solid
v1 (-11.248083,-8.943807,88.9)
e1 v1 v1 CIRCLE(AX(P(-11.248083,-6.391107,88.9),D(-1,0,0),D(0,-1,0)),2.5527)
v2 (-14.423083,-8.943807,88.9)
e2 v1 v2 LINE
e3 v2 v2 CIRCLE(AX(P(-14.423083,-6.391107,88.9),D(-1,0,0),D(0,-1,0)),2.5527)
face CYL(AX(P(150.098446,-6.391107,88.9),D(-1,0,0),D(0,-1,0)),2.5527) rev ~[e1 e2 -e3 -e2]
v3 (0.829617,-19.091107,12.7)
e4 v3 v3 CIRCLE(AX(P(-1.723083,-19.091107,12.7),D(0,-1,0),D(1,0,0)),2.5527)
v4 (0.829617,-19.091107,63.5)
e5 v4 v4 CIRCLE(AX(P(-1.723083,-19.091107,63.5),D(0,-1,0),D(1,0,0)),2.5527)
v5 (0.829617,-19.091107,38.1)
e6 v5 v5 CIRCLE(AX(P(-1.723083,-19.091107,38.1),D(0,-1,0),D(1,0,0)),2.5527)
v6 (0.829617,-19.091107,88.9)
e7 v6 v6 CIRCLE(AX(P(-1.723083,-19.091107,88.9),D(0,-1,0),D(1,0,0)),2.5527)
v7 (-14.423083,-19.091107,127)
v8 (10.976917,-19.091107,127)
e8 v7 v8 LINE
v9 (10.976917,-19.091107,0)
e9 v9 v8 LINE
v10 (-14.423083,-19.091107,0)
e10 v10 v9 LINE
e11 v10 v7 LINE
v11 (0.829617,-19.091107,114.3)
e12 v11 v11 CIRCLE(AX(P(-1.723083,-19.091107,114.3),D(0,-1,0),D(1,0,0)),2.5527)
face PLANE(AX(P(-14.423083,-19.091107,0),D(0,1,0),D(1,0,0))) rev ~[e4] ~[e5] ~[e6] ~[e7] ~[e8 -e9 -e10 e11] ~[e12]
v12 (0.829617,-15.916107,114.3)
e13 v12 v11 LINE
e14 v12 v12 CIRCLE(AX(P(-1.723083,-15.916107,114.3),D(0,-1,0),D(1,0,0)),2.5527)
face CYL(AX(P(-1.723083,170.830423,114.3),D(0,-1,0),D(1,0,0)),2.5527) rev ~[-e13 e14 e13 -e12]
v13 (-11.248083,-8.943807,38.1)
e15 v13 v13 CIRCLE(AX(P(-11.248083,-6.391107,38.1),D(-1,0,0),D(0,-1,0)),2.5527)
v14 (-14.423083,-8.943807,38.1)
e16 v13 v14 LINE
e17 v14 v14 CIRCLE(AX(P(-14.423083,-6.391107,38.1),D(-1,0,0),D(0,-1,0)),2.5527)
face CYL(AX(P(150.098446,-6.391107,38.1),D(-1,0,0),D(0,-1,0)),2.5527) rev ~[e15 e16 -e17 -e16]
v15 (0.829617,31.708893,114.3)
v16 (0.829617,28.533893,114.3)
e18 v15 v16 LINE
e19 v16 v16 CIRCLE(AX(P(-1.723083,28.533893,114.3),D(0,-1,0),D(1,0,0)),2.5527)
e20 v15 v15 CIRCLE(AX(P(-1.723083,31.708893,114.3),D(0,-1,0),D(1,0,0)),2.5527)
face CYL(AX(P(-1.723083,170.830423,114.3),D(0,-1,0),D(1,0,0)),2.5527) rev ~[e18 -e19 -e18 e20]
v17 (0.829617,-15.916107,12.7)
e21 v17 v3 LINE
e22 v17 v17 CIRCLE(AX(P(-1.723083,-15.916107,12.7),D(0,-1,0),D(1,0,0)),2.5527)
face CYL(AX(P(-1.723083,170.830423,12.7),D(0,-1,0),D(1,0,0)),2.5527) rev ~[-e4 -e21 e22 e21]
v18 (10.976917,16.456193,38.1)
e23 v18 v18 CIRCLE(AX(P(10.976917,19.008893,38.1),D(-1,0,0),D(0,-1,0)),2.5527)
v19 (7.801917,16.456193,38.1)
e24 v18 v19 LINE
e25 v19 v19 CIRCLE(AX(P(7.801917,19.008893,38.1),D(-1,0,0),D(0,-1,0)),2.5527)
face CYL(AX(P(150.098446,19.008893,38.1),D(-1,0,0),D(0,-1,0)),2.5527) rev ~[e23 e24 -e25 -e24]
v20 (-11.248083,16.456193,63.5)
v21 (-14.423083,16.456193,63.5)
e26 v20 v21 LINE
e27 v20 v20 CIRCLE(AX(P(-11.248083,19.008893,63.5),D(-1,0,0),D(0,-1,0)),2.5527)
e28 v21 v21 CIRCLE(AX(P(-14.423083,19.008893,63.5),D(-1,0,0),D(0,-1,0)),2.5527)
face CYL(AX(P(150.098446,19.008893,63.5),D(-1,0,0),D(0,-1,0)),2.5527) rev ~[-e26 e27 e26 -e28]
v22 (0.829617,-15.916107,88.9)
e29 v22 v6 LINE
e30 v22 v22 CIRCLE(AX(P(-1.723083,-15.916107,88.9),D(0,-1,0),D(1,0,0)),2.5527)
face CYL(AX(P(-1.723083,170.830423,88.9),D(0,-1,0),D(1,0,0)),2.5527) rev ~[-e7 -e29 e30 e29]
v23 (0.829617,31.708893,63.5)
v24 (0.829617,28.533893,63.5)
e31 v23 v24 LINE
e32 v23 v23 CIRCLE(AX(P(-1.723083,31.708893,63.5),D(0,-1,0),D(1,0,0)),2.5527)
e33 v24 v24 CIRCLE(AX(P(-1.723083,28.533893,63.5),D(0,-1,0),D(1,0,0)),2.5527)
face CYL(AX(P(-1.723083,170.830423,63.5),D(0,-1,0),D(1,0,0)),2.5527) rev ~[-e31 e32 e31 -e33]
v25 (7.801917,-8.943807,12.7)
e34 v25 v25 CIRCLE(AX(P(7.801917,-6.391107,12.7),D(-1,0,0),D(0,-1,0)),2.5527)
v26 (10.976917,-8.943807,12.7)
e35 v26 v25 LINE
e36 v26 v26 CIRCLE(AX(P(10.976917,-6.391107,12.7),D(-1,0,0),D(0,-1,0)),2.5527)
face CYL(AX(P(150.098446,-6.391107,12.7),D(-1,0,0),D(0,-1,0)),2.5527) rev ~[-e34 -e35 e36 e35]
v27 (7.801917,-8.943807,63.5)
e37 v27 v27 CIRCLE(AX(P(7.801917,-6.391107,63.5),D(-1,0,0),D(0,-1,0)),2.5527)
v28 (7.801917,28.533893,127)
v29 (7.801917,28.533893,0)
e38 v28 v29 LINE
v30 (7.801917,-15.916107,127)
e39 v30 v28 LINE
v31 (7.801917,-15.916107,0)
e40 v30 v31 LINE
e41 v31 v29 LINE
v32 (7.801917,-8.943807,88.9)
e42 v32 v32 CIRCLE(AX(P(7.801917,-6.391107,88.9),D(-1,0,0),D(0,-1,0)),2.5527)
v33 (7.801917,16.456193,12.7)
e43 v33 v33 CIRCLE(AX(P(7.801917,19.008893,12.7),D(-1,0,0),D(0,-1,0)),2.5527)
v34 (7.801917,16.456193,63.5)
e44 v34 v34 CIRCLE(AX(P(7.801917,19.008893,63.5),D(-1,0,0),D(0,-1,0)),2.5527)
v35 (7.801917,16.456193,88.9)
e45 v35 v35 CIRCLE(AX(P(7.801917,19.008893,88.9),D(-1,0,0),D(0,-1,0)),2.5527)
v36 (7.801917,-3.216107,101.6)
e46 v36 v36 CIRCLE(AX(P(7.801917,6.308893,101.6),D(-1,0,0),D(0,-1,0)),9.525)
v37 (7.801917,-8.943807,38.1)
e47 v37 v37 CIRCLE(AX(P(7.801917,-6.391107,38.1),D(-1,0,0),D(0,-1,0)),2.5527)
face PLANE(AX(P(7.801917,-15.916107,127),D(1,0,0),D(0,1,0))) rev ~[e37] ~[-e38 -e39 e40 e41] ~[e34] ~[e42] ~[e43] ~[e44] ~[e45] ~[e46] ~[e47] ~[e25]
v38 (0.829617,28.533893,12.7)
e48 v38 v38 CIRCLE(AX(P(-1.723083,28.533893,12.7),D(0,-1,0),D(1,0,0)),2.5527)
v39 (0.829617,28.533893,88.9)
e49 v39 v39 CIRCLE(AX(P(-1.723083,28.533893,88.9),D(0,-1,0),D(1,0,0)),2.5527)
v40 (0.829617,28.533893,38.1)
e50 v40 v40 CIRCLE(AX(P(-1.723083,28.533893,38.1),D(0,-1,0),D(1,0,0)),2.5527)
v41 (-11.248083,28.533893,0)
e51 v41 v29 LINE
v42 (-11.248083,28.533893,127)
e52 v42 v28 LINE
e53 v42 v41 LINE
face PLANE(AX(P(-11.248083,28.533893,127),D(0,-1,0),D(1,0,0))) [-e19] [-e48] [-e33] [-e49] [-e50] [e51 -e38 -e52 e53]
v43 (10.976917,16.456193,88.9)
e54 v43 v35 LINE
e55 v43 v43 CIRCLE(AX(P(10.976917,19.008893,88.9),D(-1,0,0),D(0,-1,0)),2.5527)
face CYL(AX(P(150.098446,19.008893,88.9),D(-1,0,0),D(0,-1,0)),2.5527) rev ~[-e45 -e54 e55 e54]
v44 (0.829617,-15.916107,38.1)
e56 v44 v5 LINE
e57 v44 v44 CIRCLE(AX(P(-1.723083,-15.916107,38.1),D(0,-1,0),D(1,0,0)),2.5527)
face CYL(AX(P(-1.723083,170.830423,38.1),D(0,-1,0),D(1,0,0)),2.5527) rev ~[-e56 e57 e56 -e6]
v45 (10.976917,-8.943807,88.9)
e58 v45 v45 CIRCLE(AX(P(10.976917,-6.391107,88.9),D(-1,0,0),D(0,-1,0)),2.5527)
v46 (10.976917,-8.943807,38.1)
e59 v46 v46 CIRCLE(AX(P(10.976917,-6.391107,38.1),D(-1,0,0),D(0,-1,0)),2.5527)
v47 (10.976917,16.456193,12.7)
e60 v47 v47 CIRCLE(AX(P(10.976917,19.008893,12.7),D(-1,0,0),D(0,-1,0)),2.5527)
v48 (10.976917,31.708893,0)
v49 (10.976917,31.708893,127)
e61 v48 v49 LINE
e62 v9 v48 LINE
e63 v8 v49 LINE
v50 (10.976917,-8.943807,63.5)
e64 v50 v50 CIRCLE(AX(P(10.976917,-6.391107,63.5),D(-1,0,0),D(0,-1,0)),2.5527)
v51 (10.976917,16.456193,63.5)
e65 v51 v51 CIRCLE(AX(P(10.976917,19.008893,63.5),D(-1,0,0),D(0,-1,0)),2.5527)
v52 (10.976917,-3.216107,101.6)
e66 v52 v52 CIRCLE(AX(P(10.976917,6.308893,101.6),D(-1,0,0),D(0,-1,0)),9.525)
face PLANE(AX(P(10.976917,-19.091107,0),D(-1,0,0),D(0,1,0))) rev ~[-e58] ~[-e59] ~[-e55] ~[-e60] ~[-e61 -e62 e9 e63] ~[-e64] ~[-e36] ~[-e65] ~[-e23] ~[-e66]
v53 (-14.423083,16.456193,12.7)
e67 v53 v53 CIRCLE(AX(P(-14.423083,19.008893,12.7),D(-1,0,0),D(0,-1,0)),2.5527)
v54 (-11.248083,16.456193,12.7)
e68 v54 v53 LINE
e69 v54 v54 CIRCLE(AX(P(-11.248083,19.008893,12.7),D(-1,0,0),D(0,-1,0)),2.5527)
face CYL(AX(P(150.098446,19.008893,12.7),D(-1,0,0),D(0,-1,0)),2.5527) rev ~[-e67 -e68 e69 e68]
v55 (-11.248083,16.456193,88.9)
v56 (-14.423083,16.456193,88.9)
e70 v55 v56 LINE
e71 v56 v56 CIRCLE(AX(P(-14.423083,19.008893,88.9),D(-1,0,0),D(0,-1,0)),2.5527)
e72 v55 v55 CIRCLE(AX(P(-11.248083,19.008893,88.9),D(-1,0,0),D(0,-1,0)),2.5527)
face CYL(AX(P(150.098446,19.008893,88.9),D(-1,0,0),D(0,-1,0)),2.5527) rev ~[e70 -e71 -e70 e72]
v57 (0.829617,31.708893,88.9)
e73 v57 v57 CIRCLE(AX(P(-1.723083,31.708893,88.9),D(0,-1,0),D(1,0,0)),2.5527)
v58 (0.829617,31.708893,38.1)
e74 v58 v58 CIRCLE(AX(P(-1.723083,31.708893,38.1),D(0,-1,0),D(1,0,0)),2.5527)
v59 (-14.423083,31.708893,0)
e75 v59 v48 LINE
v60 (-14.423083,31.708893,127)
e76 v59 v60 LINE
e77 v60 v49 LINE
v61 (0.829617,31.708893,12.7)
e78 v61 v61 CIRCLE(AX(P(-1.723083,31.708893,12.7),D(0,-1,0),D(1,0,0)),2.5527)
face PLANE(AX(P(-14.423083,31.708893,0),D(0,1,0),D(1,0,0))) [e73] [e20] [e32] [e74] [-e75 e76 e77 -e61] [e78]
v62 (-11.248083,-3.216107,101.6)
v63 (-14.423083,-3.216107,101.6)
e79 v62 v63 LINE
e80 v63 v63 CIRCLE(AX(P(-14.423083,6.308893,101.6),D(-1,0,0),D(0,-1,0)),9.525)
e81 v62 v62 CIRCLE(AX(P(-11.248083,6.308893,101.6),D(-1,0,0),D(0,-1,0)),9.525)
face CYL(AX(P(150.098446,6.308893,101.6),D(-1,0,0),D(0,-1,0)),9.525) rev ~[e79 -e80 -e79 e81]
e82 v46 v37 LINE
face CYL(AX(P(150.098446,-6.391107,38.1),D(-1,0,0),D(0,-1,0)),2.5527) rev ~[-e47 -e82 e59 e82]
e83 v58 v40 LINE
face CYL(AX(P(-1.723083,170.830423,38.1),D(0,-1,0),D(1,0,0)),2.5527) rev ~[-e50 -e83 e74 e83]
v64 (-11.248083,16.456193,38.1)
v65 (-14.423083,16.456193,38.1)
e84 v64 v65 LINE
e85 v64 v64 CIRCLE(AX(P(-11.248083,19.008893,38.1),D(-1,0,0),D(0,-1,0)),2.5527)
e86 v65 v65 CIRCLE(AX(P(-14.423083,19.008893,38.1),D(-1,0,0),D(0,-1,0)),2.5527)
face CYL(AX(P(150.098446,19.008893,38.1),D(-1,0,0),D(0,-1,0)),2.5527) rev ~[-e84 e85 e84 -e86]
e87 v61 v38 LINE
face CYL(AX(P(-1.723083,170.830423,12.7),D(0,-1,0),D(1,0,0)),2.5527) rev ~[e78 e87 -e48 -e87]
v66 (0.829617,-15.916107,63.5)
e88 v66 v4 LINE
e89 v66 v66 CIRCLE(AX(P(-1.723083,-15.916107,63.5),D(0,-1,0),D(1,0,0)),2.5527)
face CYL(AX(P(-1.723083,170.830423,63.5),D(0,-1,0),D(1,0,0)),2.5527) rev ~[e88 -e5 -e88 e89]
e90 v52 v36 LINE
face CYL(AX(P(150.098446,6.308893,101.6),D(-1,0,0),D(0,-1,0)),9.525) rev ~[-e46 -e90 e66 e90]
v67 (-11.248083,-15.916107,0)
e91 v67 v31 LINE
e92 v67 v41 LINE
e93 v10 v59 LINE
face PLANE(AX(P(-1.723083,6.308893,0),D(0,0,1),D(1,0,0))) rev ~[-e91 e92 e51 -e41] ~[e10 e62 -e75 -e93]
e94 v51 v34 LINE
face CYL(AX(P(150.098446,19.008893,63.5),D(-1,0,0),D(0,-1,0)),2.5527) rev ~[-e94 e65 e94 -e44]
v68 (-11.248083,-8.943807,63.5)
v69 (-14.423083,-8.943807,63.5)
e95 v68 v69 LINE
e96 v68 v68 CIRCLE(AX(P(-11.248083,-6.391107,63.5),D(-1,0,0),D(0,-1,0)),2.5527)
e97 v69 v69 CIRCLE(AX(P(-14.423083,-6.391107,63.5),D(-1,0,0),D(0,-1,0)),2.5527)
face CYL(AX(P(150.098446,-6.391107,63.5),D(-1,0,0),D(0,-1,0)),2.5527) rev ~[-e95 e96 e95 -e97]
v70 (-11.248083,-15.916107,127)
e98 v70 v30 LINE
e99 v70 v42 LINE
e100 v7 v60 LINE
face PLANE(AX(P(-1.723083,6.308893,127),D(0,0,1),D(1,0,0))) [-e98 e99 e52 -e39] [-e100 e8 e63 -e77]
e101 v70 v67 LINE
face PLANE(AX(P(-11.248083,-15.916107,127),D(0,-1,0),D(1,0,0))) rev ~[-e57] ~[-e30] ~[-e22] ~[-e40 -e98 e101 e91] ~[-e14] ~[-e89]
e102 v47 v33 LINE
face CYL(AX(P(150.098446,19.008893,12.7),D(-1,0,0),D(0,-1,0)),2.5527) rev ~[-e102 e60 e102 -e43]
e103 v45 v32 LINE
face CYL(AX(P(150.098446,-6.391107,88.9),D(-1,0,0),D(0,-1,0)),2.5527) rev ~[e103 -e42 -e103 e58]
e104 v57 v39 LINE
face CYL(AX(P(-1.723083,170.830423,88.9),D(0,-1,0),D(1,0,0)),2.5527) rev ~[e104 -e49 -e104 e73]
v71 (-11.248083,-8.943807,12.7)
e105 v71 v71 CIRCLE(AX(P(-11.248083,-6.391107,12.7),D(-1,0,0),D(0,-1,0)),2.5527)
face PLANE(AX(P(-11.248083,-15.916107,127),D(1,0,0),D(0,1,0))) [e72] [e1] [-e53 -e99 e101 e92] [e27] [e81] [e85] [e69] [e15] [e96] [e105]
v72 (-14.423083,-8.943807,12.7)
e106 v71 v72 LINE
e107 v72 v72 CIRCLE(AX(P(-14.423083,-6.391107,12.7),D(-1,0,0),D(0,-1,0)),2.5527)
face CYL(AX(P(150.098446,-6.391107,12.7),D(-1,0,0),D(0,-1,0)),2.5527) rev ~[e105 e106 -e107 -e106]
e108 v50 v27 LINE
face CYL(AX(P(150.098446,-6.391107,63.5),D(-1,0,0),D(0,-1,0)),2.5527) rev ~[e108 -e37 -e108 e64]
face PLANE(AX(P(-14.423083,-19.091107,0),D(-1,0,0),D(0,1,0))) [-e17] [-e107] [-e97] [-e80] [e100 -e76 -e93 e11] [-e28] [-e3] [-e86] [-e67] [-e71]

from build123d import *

# Parameters (mm, degrees)
F0_W     = 25.4
F0_H     = 50.8
F1_DEPTH = 127
F2_W     = 19.05
F2_H     = 44.45
F3_DEPTH = 127
F5_D     = 19.05
F6_D     = 5.1054
F8_D     = 5.1054


# Not quite as in the source:
# - a feature names something its author has since deleted; it is built from what else it names


with BuildPart() as f1:
    # F0 (on Top) → F1 (new body)
    with BuildSketch(Plane.XY):
        with Locations((-1.7230832018, 6.3088932174)):
            Rectangle(F0_W, F0_H)
    extrude(amount=F1_DEPTH)

    # F2 (on face) → F3 (cut)
    with BuildSketch(Plane.XY.offset(127)):
        with Locations((-1.7230832018, 6.3088932174)):
            Rectangle(F2_W, F2_H)
    extrude(amount=-F3_DEPTH, mode=Mode.SUBTRACT)

    # F5 (through all)
    with Locations(Plane.YZ.offset(10.9769167982)):
        with Locations((6.3088932174, 101.6)):
            Hole(F5_D / 2)

    # F6 (through all)
    with Locations(Plane.YZ.offset(10.9769167982)):
        with Locations((-6.3911067826, 63.5), (-6.3911067826, 88.9), (-6.3911067826, 38.1), (-6.3911067826, 12.7), (19.0088932174, 38.1), (19.0088932174, 12.7), (19.0088932174, 63.5), (19.0088932174, 88.9)):
            Hole(F6_D / 2)

    # F8 (through all)
    with Locations(Plane(origin=(0, 31.7088932174, 0), x_dir=(-1, 0, 0), z_dir=(0, 1, 0))):
        with Locations((1.7230832018, 88.9), (1.7230832018, 63.5), (1.7230832018, 114.3), (1.7230832018, 12.7), (1.7230832018, 38.1)):
            Hole(F8_D / 2)


solid = f1.part
